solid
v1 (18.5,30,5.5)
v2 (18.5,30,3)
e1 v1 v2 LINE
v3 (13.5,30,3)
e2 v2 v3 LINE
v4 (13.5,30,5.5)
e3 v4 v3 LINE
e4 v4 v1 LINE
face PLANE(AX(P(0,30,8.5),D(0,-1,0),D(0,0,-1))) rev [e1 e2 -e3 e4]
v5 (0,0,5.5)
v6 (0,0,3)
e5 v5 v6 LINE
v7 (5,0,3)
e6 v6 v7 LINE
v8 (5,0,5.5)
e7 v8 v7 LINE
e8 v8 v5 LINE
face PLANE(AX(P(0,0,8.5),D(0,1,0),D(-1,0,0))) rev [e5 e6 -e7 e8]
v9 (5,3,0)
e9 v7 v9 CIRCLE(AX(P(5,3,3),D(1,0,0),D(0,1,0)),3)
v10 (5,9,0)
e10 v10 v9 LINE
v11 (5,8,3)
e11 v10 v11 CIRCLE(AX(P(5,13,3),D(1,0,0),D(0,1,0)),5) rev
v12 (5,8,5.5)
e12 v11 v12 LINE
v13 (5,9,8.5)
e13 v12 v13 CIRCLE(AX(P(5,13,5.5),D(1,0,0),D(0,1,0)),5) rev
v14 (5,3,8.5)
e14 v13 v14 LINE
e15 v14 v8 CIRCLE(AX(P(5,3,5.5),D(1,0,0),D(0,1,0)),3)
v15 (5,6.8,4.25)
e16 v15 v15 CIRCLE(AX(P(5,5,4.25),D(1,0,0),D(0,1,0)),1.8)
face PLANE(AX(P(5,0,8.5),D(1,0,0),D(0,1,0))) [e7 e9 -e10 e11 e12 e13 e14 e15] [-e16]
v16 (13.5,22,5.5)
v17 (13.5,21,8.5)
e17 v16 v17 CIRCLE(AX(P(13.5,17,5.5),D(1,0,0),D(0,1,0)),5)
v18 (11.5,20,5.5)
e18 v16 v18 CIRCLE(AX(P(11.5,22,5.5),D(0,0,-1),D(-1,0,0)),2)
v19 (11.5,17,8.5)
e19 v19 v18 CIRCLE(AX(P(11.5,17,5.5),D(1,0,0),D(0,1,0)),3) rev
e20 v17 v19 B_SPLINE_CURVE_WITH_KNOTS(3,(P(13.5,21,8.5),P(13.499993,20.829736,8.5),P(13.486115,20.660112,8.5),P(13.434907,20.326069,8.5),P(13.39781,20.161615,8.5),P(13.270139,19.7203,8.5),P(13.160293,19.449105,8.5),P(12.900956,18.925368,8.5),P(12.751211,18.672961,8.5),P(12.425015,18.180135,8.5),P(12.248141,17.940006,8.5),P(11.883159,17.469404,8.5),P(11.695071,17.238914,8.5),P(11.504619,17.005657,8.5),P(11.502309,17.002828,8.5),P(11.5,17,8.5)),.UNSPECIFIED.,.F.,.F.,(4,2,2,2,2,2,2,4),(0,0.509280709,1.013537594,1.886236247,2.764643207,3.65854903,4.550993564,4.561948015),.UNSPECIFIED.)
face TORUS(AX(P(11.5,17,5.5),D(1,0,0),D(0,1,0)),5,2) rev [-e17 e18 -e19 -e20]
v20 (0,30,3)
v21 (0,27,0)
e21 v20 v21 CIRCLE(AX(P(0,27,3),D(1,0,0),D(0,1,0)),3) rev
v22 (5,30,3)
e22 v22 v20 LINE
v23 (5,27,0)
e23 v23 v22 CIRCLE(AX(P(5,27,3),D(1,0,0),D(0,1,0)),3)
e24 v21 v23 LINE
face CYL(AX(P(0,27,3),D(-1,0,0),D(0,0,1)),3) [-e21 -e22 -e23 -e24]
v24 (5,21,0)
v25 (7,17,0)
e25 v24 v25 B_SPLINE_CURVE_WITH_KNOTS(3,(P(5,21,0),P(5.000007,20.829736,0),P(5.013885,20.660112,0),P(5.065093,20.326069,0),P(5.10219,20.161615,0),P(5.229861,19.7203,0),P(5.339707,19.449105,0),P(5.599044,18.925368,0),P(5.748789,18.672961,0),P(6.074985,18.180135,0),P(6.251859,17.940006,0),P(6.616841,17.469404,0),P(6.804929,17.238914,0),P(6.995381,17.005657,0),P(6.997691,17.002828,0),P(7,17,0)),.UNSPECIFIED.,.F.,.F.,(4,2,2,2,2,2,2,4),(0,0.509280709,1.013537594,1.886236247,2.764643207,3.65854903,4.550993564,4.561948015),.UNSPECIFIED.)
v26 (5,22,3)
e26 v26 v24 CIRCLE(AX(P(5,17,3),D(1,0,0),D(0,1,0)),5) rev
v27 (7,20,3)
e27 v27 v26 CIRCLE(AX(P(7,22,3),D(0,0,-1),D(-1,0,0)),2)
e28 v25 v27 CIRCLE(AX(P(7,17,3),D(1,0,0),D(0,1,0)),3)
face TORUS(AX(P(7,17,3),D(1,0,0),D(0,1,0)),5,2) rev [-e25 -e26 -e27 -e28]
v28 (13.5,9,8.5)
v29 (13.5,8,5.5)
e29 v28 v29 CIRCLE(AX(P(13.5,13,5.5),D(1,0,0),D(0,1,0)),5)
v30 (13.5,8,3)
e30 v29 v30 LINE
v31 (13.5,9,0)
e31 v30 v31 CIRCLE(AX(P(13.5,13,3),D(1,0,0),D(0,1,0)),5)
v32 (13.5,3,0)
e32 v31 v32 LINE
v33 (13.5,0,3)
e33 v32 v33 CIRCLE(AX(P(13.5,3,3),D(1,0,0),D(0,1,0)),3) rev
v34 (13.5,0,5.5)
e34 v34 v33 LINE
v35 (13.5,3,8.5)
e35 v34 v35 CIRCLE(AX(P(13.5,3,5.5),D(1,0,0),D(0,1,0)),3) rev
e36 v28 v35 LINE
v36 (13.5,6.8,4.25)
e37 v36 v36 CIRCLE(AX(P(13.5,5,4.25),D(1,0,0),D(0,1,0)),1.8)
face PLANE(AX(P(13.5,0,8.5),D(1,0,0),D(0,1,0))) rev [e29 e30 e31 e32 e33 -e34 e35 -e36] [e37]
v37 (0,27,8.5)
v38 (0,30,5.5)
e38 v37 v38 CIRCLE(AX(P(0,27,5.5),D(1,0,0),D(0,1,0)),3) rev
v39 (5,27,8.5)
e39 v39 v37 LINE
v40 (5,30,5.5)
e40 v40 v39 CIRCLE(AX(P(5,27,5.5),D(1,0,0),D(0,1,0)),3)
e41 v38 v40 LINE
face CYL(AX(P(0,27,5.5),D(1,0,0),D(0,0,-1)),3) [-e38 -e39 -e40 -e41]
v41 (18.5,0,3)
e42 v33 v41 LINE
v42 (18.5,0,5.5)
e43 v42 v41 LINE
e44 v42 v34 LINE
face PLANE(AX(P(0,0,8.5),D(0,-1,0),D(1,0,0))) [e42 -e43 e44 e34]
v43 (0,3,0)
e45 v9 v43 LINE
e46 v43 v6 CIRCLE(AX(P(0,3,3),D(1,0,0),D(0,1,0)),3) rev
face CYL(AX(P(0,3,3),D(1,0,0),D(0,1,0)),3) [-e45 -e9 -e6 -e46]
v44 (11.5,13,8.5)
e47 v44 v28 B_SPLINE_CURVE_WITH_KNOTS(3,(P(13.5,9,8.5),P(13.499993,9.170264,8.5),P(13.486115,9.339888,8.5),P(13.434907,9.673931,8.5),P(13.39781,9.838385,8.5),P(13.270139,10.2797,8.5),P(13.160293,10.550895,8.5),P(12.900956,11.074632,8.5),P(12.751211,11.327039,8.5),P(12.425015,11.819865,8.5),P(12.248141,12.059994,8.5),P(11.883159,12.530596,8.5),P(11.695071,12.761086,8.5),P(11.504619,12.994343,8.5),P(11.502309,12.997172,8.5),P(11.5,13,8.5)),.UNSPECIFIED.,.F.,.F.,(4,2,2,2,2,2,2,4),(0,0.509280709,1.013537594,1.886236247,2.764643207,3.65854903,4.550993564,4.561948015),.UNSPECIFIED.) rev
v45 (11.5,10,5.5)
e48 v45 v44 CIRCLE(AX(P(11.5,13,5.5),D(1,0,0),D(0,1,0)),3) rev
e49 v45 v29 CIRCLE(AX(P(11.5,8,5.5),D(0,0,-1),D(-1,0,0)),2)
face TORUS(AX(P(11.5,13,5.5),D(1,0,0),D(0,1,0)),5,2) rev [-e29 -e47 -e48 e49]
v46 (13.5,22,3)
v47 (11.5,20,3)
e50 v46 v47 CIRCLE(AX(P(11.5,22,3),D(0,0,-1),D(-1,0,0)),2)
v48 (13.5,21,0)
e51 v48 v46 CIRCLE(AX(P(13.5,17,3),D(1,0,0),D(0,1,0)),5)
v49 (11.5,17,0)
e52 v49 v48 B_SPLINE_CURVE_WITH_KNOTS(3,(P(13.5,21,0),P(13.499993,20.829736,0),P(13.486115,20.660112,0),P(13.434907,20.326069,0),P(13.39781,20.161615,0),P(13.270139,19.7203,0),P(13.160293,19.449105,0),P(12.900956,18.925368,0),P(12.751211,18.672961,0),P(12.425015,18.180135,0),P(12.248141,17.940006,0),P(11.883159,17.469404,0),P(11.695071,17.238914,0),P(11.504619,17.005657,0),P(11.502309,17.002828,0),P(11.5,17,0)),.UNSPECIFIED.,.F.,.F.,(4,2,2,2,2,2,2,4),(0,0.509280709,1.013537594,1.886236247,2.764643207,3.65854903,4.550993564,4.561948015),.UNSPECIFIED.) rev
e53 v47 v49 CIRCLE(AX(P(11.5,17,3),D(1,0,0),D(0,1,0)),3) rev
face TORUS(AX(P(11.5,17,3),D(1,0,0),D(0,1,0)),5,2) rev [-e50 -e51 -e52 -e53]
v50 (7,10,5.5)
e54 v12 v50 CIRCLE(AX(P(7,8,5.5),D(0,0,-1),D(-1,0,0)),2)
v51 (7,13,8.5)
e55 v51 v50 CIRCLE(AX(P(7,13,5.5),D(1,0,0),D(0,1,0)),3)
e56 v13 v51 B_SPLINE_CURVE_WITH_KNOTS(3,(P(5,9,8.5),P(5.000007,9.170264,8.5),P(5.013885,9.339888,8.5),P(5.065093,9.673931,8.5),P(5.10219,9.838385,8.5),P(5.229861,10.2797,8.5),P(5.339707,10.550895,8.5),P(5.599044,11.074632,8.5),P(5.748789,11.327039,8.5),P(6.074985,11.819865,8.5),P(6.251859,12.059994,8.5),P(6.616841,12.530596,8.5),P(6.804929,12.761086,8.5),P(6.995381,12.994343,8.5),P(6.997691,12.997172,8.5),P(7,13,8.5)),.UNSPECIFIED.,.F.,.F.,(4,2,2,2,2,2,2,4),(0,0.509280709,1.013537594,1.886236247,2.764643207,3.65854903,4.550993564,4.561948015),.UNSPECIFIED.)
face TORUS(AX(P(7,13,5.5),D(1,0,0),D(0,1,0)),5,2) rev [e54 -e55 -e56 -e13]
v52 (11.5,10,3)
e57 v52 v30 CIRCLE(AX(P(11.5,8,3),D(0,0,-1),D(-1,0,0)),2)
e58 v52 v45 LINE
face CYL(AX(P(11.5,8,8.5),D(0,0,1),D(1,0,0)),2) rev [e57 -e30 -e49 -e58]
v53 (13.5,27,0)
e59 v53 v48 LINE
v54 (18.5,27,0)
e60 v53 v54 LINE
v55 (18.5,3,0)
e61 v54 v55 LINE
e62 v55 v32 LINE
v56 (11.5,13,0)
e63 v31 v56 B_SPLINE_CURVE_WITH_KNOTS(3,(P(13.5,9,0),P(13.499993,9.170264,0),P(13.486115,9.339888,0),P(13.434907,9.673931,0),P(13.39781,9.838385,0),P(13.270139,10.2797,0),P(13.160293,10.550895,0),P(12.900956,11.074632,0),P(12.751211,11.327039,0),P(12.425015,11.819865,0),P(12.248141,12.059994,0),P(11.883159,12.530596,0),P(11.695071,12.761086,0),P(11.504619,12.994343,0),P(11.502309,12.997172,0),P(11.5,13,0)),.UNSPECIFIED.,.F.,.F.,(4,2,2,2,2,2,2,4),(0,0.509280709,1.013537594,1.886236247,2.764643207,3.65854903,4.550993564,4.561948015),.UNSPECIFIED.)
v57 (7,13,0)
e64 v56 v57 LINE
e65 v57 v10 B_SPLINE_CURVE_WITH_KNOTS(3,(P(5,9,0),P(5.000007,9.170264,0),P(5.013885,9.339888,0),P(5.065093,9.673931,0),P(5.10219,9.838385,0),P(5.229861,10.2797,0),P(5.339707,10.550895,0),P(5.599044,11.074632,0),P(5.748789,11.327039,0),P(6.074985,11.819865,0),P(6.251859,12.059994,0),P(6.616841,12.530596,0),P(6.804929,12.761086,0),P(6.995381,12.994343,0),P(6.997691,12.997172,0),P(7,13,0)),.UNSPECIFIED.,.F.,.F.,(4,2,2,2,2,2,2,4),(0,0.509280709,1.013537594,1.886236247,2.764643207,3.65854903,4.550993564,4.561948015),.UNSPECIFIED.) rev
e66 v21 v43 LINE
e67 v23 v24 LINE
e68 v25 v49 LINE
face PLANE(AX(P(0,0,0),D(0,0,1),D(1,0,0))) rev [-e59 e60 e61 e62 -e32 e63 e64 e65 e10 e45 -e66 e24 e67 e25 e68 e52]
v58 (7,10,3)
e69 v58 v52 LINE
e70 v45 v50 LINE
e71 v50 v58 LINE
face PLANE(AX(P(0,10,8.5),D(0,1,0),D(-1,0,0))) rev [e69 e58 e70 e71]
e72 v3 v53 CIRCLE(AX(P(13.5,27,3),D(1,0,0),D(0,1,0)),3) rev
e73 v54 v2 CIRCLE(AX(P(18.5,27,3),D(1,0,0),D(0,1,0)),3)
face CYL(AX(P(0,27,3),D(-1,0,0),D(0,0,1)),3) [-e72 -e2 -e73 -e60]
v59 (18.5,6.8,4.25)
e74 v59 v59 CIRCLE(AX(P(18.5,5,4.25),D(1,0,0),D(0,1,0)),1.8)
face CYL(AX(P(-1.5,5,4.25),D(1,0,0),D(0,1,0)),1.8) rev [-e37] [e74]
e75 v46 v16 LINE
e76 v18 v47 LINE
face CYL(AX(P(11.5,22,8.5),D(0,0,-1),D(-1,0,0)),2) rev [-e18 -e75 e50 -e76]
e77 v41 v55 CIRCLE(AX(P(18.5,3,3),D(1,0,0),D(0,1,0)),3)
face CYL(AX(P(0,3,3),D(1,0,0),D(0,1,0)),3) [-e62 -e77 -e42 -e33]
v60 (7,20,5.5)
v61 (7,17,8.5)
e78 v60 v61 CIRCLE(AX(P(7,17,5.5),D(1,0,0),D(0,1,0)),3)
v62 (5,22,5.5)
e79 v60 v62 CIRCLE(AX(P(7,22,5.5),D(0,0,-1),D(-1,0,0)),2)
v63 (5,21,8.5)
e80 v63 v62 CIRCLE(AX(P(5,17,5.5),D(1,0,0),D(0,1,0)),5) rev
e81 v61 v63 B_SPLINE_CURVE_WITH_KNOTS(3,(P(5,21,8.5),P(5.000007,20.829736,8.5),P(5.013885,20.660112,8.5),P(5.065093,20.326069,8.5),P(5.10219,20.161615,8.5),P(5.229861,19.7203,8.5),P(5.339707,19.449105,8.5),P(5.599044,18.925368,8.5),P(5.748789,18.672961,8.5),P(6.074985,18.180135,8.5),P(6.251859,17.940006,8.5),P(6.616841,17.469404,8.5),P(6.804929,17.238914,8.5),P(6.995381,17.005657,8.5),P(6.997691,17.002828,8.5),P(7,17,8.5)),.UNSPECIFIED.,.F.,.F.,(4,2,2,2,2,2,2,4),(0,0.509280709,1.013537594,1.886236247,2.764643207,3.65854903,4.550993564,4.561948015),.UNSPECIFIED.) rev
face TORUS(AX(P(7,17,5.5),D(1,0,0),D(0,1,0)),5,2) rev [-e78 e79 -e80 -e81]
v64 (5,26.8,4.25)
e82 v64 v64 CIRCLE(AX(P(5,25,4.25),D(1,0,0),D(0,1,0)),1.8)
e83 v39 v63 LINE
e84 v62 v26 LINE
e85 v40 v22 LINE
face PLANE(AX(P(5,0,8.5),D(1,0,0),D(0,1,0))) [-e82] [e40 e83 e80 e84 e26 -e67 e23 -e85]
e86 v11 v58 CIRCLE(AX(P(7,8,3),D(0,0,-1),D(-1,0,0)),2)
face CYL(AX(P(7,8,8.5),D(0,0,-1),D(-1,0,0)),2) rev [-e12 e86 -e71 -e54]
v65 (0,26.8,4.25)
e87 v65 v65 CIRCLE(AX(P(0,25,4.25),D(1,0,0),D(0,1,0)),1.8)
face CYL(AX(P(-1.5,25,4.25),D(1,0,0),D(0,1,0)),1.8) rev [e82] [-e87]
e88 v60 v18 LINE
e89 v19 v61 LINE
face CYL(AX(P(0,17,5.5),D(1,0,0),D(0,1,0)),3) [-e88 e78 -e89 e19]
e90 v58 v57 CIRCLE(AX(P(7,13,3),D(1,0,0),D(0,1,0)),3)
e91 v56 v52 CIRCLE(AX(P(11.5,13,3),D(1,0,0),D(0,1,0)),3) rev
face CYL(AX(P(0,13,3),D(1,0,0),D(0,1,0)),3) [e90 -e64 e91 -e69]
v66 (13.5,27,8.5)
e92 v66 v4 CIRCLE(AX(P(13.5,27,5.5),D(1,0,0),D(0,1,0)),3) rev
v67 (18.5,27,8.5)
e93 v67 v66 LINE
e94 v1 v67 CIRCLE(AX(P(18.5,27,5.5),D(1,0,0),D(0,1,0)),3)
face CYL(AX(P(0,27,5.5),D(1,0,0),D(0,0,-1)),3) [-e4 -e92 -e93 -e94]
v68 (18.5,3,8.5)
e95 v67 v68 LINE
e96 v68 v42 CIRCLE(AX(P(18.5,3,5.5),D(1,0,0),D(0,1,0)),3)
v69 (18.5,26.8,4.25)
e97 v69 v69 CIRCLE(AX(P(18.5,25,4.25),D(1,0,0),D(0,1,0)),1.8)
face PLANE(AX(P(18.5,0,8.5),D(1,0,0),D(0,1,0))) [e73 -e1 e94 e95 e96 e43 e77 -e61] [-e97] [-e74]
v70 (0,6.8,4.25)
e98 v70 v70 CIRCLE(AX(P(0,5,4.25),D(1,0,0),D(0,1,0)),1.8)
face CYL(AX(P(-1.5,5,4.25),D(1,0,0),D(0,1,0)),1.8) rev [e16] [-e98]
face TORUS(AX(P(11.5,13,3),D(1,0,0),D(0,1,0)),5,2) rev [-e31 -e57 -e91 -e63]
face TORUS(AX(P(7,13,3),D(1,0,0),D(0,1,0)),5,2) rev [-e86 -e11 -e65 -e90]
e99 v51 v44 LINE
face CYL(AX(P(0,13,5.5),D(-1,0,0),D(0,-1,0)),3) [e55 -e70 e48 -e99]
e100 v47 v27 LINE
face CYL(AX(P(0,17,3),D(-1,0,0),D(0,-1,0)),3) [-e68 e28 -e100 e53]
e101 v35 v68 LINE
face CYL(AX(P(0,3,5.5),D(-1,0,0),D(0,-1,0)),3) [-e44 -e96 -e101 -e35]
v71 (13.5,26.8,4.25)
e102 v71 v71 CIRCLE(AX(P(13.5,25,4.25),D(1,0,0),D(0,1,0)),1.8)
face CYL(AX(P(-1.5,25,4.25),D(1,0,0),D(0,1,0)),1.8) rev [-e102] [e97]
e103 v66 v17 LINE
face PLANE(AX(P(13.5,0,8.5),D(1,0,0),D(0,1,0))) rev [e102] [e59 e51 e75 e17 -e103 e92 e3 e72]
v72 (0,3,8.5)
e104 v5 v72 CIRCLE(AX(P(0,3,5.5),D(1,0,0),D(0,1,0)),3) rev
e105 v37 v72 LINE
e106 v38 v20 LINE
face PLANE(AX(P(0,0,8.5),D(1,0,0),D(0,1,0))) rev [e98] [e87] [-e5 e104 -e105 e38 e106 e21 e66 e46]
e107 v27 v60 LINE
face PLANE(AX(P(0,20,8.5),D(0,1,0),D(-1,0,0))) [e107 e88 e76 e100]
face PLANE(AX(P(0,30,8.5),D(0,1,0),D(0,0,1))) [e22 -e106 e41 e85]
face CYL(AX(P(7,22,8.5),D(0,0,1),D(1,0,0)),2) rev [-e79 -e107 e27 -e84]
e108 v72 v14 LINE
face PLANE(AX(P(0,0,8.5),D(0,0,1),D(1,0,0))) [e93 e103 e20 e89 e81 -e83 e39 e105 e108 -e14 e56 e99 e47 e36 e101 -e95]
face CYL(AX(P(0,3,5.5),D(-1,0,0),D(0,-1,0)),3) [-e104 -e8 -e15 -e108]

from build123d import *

# Parameters (mm, degrees)
ESQUISSE1_W             = 5
ESQUISSE1_H             = 30
ESQUISSE1_W_2           = 8.5
ESQUISSE1_H_2           = 10
BOSS_EXTRU_1_DEPTH      = 8.5
ESQUISSE2_R             = 1.8
ENL_V_MAT_EXTRU_1_DEPTH = 20
CONG_3_R                = 3
CONG_1_R                = 2


with BuildPart() as part:
    # Esquisse1 → Boss.-Extru.1 (new body)
    with BuildSketch(Plane.XY):
        with Locations((2.5, 15)):
            Rectangle(ESQUISSE1_W, ESQUISSE1_H)
        with Locations((16, 15)):
            Rectangle(ESQUISSE1_W, ESQUISSE1_H)
        with Locations((9.25, 15)):
            Rectangle(ESQUISSE1_W_2, ESQUISSE1_H_2)
    extrude(amount=BOSS_EXTRU_1_DEPTH)

    # Esquisse2 → Enlèv. mat.-Extru.1 (cut)
    with BuildSketch(Plane(origin=(18.5, 0, 0), x_dir=(0, 0, -1), z_dir=(1, 0, 0))):
        with Locations(Location((-4.25, 25, 0), (0, 0, 90))):
            Circle(ESQUISSE2_R)
        with Locations(Location((-4.25, 5, 0), (0, 0, 90))):
            Circle(ESQUISSE2_R)
    extrude(amount=-ENL_V_MAT_EXTRU_1_DEPTH, mode=Mode.SUBTRACT)

    # Congé3
    cong_3_edges = [part.edges().sort_by_distance(p)[0] for p in [
        (2.5, 30, 8.5),
        (9.25, 20, 0),
        (16, 30, 0),
        (16, 0, 0),
        (9.25, 10, 0),
        (2.5, 0, 0),
        (2.5, 30, 0),
        (2.5, 0, 8.5),
        (9.25, 10, 8.5),
        (16, 0, 8.5),
        (16, 30, 8.5),
        (9.25, 20, 8.5),
    ]]
    fillet(cong_3_edges, radius=CONG_3_R)

    # Congé1
    # the kernel refuses this fillet: 2 mm, written as the material it adds along each edge
    with BuildSketch(Plane(origin=(13.5, 10, 3), x_dir=(0, -1, 0), z_dir=(0, 0, 1)), Plane(origin=(5, 20, 3), x_dir=(0, 1, 0), z_dir=(0, 0, 1))) as cong_1_piece_1:
        with BuildLine():
            CenterArc((CONG_1_R, -CONG_1_R), CONG_1_R, 90, 90)
            Line((0, -CONG_1_R), (0, 0))
            Line((0, 0), (CONG_1_R, 0))
        make_face()
    extrude(amount=2.5)
    with BuildSketch(Plane(origin=(13.5, 17, 3), x_dir=(0, -0.9953436464450918, 0.09638996566753391), z_dir=(0, 0.09638996566753391, 0.9953436464450918))) as cong_1_piece_2_section:
        with BuildLine():
            CenterArc((3 + CONG_1_R, -CONG_1_R), CONG_1_R, 90, 90)
            Line((3, -CONG_1_R), (3, 0))
            Line((3, 0), (3 + CONG_1_R, 0))
        make_face()
    cong_1_piece_2 = revolve(axis=Axis((13.5, 17, 3), (1, 0, 0)), revolution_arc=185.531326158, mode=Mode.PRIVATE)
    cong_1_piece_2 = split(cong_1_piece_2, bisect_by=Plane(origin=(12.926399559, 19.220886719, 0), z_dir=(0, 0, 1)), keep=Keep.TOP, mode=Mode.PRIVATE)
    add(cong_1_piece_2)
    with BuildSketch(Plane(origin=(5, 17, 3), x_dir=(0, -0.9953436464450918, 0.09638996566753227), z_dir=(0, 0.09638996566753227, 0.9953436464450918))) as cong_1_piece_3_section:
        with BuildLine():
            CenterArc((3 + CONG_1_R, CONG_1_R), CONG_1_R, 180, 90)
            Line((3 + CONG_1_R, 0), (3, 0))
            Line((3, 0), (3, CONG_1_R))
        make_face()
    cong_1_piece_3 = revolve(axis=Axis((5, 17, 3), (1, 0, 0)), revolution_arc=185.531326158, mode=Mode.PRIVATE)
    cong_1_piece_3 = split(cong_1_piece_3, bisect_by=Plane(origin=(5.573600437, 19.220886663, 0), z_dir=(0, 0, 1)), keep=Keep.TOP, mode=Mode.PRIVATE)
    add(cong_1_piece_3)
    with BuildSketch(Plane(origin=(13.5, 13, 3), x_dir=(0, 0.9953436464450918, 0.09638996566753272), z_dir=(0, -0.09638996566753272, 0.9953436464450918))) as cong_1_piece_4_section:
        with BuildLine():
            CenterArc((3 + CONG_1_R, CONG_1_R), CONG_1_R, 180, 90)
            Line((3 + CONG_1_R, 0), (3, 0))
            Line((3, 0), (3, CONG_1_R))
        make_face()
    cong_1_piece_4 = revolve(axis=Axis((13.5, 13, 3), (-1, 0, 0)), revolution_arc=185.531326158, mode=Mode.PRIVATE)
    cong_1_piece_4 = split(cong_1_piece_4, bisect_by=Plane(origin=(12.926399561, 10.779113284, 0), z_dir=(0, 0, 1)), keep=Keep.TOP, mode=Mode.PRIVATE)
    add(cong_1_piece_4)
    with BuildSketch(Plane(origin=(5, 13, 3), x_dir=(0, 0.9953436464450918, 0.09638996566753391), z_dir=(0, -0.09638996566753391, 0.9953436464450918))) as cong_1_piece_5_section:
        with BuildLine():
            CenterArc((3 + CONG_1_R, -CONG_1_R), CONG_1_R, 90, 90)
            Line((3, -CONG_1_R), (3, 0))
            Line((3, 0), (3 + CONG_1_R, 0))
        make_face()
    cong_1_piece_5 = revolve(axis=Axis((5, 13, 3), (-1, 0, 0)), revolution_arc=185.531326158, mode=Mode.PRIVATE)
    cong_1_piece_5 = split(cong_1_piece_5, bisect_by=Plane(origin=(5.573600429, 10.779113281, 0), z_dir=(0, 0, 1)), keep=Keep.TOP, mode=Mode.PRIVATE)
    add(cong_1_piece_5)
    with BuildSketch(Plane(origin=(13.5, 17, 5.5), x_dir=(0, -0.9953436464450917, -0.09638996566753434), z_dir=(0, 0.09638996566753434, -0.9953436464450917))) as cong_1_piece_6_section:
        with BuildLine():
            CenterArc((3 + CONG_1_R, CONG_1_R), CONG_1_R, 180, 90)
            Line((3, CONG_1_R), (3, 0))
            Line((3, 0), (3 + CONG_1_R, 0))
        make_face()
    cong_1_piece_6 = revolve(axis=Axis((13.5, 17, 5.5), (-1, 0, 0)), revolution_arc=185.531326158, mode=Mode.PRIVATE)
    cong_1_piece_6 = split(cong_1_piece_6, bisect_by=Plane(origin=(12.92639966, 19.220886752, 8.5), z_dir=(0, 0, -1)), keep=Keep.TOP, mode=Mode.PRIVATE)
    add(cong_1_piece_6)
    with BuildSketch(Plane(origin=(5, 17, 5.5), x_dir=(0, -0.9953436464450918, -0.09638996566753258), z_dir=(0, 0.09638996566753258, -0.9953436464450918))) as cong_1_piece_7_section:
        with BuildLine():
            CenterArc((3 + CONG_1_R, -CONG_1_R), CONG_1_R, 90, 90)
            Line((3, -CONG_1_R), (3, 0))
            Line((3, 0), (3 + CONG_1_R, 0))
        make_face()
    cong_1_piece_7 = revolve(axis=Axis((5, 17, 5.5), (-1, 0, 0)), revolution_arc=185.531326158, mode=Mode.PRIVATE)
    cong_1_piece_7 = split(cong_1_piece_7, bisect_by=Plane(origin=(5.573251137, 19.22118781, 8.5), z_dir=(0, 0, -1)), keep=Keep.TOP, mode=Mode.PRIVATE)
    add(cong_1_piece_7)
    with BuildSketch(Plane(origin=(13.5, 13, 5.5), x_dir=(0, 0.9953436464450918, -0.09638996566753316), z_dir=(0, -0.09638996566753316, -0.9953436464450918))) as cong_1_piece_8_section:
        with BuildLine():
            CenterArc((3 + CONG_1_R, -CONG_1_R), CONG_1_R, 90, 90)
            Line((3, -CONG_1_R), (3, 0))
            Line((3, 0), (3 + CONG_1_R, 0))
        make_face()
    cong_1_piece_8 = revolve(axis=Axis((13.5, 13, 5.5), (1, 0, 0)), revolution_arc=185.531326158, mode=Mode.PRIVATE)
    cong_1_piece_8 = split(cong_1_piece_8, bisect_by=Plane(origin=(12.926652362, 10.77922389, 8.5), z_dir=(0, 0, -1)), keep=Keep.TOP, mode=Mode.PRIVATE)
    add(cong_1_piece_8)
    with BuildSketch(Plane(origin=(5, 13, 5.5), x_dir=(0, 0.9953436464450917, -0.09638996566753434), z_dir=(0, -0.09638996566753434, -0.9953436464450917))) as cong_1_piece_9_section:
        with BuildLine():
            CenterArc((3 + CONG_1_R, CONG_1_R), CONG_1_R, 180, 90)
            Line((3, CONG_1_R), (3, 0))
            Line((3, 0), (3 + CONG_1_R, 0))
        make_face()
    cong_1_piece_9 = revolve(axis=Axis((5, 13, 5.5), (1, 0, 0)), revolution_arc=185.531326158, mode=Mode.PRIVATE)
    cong_1_piece_9 = split(cong_1_piece_9, bisect_by=Plane(origin=(5.573600352, 10.779113305, 8.5), z_dir=(0, 0, -1)), keep=Keep.TOP, mode=Mode.PRIVATE)
    add(cong_1_piece_9)
    with BuildSketch(Plane(origin=(13.5, 20, 3), x_dir=(0, 1, 0), z_dir=(0, 0, 1)), Plane(origin=(5, 10, 3), x_dir=(0, -1, 0), z_dir=(0, 0, 1))) as cong_1_piece_10:
        with BuildLine():
            CenterArc((CONG_1_R, CONG_1_R), CONG_1_R, 180, 90)
            Line((0, CONG_1_R), (0, 0))
            Line((0, 0), (CONG_1_R, 0))
        make_face()
    extrude(amount=2.5)


solid = part.part
